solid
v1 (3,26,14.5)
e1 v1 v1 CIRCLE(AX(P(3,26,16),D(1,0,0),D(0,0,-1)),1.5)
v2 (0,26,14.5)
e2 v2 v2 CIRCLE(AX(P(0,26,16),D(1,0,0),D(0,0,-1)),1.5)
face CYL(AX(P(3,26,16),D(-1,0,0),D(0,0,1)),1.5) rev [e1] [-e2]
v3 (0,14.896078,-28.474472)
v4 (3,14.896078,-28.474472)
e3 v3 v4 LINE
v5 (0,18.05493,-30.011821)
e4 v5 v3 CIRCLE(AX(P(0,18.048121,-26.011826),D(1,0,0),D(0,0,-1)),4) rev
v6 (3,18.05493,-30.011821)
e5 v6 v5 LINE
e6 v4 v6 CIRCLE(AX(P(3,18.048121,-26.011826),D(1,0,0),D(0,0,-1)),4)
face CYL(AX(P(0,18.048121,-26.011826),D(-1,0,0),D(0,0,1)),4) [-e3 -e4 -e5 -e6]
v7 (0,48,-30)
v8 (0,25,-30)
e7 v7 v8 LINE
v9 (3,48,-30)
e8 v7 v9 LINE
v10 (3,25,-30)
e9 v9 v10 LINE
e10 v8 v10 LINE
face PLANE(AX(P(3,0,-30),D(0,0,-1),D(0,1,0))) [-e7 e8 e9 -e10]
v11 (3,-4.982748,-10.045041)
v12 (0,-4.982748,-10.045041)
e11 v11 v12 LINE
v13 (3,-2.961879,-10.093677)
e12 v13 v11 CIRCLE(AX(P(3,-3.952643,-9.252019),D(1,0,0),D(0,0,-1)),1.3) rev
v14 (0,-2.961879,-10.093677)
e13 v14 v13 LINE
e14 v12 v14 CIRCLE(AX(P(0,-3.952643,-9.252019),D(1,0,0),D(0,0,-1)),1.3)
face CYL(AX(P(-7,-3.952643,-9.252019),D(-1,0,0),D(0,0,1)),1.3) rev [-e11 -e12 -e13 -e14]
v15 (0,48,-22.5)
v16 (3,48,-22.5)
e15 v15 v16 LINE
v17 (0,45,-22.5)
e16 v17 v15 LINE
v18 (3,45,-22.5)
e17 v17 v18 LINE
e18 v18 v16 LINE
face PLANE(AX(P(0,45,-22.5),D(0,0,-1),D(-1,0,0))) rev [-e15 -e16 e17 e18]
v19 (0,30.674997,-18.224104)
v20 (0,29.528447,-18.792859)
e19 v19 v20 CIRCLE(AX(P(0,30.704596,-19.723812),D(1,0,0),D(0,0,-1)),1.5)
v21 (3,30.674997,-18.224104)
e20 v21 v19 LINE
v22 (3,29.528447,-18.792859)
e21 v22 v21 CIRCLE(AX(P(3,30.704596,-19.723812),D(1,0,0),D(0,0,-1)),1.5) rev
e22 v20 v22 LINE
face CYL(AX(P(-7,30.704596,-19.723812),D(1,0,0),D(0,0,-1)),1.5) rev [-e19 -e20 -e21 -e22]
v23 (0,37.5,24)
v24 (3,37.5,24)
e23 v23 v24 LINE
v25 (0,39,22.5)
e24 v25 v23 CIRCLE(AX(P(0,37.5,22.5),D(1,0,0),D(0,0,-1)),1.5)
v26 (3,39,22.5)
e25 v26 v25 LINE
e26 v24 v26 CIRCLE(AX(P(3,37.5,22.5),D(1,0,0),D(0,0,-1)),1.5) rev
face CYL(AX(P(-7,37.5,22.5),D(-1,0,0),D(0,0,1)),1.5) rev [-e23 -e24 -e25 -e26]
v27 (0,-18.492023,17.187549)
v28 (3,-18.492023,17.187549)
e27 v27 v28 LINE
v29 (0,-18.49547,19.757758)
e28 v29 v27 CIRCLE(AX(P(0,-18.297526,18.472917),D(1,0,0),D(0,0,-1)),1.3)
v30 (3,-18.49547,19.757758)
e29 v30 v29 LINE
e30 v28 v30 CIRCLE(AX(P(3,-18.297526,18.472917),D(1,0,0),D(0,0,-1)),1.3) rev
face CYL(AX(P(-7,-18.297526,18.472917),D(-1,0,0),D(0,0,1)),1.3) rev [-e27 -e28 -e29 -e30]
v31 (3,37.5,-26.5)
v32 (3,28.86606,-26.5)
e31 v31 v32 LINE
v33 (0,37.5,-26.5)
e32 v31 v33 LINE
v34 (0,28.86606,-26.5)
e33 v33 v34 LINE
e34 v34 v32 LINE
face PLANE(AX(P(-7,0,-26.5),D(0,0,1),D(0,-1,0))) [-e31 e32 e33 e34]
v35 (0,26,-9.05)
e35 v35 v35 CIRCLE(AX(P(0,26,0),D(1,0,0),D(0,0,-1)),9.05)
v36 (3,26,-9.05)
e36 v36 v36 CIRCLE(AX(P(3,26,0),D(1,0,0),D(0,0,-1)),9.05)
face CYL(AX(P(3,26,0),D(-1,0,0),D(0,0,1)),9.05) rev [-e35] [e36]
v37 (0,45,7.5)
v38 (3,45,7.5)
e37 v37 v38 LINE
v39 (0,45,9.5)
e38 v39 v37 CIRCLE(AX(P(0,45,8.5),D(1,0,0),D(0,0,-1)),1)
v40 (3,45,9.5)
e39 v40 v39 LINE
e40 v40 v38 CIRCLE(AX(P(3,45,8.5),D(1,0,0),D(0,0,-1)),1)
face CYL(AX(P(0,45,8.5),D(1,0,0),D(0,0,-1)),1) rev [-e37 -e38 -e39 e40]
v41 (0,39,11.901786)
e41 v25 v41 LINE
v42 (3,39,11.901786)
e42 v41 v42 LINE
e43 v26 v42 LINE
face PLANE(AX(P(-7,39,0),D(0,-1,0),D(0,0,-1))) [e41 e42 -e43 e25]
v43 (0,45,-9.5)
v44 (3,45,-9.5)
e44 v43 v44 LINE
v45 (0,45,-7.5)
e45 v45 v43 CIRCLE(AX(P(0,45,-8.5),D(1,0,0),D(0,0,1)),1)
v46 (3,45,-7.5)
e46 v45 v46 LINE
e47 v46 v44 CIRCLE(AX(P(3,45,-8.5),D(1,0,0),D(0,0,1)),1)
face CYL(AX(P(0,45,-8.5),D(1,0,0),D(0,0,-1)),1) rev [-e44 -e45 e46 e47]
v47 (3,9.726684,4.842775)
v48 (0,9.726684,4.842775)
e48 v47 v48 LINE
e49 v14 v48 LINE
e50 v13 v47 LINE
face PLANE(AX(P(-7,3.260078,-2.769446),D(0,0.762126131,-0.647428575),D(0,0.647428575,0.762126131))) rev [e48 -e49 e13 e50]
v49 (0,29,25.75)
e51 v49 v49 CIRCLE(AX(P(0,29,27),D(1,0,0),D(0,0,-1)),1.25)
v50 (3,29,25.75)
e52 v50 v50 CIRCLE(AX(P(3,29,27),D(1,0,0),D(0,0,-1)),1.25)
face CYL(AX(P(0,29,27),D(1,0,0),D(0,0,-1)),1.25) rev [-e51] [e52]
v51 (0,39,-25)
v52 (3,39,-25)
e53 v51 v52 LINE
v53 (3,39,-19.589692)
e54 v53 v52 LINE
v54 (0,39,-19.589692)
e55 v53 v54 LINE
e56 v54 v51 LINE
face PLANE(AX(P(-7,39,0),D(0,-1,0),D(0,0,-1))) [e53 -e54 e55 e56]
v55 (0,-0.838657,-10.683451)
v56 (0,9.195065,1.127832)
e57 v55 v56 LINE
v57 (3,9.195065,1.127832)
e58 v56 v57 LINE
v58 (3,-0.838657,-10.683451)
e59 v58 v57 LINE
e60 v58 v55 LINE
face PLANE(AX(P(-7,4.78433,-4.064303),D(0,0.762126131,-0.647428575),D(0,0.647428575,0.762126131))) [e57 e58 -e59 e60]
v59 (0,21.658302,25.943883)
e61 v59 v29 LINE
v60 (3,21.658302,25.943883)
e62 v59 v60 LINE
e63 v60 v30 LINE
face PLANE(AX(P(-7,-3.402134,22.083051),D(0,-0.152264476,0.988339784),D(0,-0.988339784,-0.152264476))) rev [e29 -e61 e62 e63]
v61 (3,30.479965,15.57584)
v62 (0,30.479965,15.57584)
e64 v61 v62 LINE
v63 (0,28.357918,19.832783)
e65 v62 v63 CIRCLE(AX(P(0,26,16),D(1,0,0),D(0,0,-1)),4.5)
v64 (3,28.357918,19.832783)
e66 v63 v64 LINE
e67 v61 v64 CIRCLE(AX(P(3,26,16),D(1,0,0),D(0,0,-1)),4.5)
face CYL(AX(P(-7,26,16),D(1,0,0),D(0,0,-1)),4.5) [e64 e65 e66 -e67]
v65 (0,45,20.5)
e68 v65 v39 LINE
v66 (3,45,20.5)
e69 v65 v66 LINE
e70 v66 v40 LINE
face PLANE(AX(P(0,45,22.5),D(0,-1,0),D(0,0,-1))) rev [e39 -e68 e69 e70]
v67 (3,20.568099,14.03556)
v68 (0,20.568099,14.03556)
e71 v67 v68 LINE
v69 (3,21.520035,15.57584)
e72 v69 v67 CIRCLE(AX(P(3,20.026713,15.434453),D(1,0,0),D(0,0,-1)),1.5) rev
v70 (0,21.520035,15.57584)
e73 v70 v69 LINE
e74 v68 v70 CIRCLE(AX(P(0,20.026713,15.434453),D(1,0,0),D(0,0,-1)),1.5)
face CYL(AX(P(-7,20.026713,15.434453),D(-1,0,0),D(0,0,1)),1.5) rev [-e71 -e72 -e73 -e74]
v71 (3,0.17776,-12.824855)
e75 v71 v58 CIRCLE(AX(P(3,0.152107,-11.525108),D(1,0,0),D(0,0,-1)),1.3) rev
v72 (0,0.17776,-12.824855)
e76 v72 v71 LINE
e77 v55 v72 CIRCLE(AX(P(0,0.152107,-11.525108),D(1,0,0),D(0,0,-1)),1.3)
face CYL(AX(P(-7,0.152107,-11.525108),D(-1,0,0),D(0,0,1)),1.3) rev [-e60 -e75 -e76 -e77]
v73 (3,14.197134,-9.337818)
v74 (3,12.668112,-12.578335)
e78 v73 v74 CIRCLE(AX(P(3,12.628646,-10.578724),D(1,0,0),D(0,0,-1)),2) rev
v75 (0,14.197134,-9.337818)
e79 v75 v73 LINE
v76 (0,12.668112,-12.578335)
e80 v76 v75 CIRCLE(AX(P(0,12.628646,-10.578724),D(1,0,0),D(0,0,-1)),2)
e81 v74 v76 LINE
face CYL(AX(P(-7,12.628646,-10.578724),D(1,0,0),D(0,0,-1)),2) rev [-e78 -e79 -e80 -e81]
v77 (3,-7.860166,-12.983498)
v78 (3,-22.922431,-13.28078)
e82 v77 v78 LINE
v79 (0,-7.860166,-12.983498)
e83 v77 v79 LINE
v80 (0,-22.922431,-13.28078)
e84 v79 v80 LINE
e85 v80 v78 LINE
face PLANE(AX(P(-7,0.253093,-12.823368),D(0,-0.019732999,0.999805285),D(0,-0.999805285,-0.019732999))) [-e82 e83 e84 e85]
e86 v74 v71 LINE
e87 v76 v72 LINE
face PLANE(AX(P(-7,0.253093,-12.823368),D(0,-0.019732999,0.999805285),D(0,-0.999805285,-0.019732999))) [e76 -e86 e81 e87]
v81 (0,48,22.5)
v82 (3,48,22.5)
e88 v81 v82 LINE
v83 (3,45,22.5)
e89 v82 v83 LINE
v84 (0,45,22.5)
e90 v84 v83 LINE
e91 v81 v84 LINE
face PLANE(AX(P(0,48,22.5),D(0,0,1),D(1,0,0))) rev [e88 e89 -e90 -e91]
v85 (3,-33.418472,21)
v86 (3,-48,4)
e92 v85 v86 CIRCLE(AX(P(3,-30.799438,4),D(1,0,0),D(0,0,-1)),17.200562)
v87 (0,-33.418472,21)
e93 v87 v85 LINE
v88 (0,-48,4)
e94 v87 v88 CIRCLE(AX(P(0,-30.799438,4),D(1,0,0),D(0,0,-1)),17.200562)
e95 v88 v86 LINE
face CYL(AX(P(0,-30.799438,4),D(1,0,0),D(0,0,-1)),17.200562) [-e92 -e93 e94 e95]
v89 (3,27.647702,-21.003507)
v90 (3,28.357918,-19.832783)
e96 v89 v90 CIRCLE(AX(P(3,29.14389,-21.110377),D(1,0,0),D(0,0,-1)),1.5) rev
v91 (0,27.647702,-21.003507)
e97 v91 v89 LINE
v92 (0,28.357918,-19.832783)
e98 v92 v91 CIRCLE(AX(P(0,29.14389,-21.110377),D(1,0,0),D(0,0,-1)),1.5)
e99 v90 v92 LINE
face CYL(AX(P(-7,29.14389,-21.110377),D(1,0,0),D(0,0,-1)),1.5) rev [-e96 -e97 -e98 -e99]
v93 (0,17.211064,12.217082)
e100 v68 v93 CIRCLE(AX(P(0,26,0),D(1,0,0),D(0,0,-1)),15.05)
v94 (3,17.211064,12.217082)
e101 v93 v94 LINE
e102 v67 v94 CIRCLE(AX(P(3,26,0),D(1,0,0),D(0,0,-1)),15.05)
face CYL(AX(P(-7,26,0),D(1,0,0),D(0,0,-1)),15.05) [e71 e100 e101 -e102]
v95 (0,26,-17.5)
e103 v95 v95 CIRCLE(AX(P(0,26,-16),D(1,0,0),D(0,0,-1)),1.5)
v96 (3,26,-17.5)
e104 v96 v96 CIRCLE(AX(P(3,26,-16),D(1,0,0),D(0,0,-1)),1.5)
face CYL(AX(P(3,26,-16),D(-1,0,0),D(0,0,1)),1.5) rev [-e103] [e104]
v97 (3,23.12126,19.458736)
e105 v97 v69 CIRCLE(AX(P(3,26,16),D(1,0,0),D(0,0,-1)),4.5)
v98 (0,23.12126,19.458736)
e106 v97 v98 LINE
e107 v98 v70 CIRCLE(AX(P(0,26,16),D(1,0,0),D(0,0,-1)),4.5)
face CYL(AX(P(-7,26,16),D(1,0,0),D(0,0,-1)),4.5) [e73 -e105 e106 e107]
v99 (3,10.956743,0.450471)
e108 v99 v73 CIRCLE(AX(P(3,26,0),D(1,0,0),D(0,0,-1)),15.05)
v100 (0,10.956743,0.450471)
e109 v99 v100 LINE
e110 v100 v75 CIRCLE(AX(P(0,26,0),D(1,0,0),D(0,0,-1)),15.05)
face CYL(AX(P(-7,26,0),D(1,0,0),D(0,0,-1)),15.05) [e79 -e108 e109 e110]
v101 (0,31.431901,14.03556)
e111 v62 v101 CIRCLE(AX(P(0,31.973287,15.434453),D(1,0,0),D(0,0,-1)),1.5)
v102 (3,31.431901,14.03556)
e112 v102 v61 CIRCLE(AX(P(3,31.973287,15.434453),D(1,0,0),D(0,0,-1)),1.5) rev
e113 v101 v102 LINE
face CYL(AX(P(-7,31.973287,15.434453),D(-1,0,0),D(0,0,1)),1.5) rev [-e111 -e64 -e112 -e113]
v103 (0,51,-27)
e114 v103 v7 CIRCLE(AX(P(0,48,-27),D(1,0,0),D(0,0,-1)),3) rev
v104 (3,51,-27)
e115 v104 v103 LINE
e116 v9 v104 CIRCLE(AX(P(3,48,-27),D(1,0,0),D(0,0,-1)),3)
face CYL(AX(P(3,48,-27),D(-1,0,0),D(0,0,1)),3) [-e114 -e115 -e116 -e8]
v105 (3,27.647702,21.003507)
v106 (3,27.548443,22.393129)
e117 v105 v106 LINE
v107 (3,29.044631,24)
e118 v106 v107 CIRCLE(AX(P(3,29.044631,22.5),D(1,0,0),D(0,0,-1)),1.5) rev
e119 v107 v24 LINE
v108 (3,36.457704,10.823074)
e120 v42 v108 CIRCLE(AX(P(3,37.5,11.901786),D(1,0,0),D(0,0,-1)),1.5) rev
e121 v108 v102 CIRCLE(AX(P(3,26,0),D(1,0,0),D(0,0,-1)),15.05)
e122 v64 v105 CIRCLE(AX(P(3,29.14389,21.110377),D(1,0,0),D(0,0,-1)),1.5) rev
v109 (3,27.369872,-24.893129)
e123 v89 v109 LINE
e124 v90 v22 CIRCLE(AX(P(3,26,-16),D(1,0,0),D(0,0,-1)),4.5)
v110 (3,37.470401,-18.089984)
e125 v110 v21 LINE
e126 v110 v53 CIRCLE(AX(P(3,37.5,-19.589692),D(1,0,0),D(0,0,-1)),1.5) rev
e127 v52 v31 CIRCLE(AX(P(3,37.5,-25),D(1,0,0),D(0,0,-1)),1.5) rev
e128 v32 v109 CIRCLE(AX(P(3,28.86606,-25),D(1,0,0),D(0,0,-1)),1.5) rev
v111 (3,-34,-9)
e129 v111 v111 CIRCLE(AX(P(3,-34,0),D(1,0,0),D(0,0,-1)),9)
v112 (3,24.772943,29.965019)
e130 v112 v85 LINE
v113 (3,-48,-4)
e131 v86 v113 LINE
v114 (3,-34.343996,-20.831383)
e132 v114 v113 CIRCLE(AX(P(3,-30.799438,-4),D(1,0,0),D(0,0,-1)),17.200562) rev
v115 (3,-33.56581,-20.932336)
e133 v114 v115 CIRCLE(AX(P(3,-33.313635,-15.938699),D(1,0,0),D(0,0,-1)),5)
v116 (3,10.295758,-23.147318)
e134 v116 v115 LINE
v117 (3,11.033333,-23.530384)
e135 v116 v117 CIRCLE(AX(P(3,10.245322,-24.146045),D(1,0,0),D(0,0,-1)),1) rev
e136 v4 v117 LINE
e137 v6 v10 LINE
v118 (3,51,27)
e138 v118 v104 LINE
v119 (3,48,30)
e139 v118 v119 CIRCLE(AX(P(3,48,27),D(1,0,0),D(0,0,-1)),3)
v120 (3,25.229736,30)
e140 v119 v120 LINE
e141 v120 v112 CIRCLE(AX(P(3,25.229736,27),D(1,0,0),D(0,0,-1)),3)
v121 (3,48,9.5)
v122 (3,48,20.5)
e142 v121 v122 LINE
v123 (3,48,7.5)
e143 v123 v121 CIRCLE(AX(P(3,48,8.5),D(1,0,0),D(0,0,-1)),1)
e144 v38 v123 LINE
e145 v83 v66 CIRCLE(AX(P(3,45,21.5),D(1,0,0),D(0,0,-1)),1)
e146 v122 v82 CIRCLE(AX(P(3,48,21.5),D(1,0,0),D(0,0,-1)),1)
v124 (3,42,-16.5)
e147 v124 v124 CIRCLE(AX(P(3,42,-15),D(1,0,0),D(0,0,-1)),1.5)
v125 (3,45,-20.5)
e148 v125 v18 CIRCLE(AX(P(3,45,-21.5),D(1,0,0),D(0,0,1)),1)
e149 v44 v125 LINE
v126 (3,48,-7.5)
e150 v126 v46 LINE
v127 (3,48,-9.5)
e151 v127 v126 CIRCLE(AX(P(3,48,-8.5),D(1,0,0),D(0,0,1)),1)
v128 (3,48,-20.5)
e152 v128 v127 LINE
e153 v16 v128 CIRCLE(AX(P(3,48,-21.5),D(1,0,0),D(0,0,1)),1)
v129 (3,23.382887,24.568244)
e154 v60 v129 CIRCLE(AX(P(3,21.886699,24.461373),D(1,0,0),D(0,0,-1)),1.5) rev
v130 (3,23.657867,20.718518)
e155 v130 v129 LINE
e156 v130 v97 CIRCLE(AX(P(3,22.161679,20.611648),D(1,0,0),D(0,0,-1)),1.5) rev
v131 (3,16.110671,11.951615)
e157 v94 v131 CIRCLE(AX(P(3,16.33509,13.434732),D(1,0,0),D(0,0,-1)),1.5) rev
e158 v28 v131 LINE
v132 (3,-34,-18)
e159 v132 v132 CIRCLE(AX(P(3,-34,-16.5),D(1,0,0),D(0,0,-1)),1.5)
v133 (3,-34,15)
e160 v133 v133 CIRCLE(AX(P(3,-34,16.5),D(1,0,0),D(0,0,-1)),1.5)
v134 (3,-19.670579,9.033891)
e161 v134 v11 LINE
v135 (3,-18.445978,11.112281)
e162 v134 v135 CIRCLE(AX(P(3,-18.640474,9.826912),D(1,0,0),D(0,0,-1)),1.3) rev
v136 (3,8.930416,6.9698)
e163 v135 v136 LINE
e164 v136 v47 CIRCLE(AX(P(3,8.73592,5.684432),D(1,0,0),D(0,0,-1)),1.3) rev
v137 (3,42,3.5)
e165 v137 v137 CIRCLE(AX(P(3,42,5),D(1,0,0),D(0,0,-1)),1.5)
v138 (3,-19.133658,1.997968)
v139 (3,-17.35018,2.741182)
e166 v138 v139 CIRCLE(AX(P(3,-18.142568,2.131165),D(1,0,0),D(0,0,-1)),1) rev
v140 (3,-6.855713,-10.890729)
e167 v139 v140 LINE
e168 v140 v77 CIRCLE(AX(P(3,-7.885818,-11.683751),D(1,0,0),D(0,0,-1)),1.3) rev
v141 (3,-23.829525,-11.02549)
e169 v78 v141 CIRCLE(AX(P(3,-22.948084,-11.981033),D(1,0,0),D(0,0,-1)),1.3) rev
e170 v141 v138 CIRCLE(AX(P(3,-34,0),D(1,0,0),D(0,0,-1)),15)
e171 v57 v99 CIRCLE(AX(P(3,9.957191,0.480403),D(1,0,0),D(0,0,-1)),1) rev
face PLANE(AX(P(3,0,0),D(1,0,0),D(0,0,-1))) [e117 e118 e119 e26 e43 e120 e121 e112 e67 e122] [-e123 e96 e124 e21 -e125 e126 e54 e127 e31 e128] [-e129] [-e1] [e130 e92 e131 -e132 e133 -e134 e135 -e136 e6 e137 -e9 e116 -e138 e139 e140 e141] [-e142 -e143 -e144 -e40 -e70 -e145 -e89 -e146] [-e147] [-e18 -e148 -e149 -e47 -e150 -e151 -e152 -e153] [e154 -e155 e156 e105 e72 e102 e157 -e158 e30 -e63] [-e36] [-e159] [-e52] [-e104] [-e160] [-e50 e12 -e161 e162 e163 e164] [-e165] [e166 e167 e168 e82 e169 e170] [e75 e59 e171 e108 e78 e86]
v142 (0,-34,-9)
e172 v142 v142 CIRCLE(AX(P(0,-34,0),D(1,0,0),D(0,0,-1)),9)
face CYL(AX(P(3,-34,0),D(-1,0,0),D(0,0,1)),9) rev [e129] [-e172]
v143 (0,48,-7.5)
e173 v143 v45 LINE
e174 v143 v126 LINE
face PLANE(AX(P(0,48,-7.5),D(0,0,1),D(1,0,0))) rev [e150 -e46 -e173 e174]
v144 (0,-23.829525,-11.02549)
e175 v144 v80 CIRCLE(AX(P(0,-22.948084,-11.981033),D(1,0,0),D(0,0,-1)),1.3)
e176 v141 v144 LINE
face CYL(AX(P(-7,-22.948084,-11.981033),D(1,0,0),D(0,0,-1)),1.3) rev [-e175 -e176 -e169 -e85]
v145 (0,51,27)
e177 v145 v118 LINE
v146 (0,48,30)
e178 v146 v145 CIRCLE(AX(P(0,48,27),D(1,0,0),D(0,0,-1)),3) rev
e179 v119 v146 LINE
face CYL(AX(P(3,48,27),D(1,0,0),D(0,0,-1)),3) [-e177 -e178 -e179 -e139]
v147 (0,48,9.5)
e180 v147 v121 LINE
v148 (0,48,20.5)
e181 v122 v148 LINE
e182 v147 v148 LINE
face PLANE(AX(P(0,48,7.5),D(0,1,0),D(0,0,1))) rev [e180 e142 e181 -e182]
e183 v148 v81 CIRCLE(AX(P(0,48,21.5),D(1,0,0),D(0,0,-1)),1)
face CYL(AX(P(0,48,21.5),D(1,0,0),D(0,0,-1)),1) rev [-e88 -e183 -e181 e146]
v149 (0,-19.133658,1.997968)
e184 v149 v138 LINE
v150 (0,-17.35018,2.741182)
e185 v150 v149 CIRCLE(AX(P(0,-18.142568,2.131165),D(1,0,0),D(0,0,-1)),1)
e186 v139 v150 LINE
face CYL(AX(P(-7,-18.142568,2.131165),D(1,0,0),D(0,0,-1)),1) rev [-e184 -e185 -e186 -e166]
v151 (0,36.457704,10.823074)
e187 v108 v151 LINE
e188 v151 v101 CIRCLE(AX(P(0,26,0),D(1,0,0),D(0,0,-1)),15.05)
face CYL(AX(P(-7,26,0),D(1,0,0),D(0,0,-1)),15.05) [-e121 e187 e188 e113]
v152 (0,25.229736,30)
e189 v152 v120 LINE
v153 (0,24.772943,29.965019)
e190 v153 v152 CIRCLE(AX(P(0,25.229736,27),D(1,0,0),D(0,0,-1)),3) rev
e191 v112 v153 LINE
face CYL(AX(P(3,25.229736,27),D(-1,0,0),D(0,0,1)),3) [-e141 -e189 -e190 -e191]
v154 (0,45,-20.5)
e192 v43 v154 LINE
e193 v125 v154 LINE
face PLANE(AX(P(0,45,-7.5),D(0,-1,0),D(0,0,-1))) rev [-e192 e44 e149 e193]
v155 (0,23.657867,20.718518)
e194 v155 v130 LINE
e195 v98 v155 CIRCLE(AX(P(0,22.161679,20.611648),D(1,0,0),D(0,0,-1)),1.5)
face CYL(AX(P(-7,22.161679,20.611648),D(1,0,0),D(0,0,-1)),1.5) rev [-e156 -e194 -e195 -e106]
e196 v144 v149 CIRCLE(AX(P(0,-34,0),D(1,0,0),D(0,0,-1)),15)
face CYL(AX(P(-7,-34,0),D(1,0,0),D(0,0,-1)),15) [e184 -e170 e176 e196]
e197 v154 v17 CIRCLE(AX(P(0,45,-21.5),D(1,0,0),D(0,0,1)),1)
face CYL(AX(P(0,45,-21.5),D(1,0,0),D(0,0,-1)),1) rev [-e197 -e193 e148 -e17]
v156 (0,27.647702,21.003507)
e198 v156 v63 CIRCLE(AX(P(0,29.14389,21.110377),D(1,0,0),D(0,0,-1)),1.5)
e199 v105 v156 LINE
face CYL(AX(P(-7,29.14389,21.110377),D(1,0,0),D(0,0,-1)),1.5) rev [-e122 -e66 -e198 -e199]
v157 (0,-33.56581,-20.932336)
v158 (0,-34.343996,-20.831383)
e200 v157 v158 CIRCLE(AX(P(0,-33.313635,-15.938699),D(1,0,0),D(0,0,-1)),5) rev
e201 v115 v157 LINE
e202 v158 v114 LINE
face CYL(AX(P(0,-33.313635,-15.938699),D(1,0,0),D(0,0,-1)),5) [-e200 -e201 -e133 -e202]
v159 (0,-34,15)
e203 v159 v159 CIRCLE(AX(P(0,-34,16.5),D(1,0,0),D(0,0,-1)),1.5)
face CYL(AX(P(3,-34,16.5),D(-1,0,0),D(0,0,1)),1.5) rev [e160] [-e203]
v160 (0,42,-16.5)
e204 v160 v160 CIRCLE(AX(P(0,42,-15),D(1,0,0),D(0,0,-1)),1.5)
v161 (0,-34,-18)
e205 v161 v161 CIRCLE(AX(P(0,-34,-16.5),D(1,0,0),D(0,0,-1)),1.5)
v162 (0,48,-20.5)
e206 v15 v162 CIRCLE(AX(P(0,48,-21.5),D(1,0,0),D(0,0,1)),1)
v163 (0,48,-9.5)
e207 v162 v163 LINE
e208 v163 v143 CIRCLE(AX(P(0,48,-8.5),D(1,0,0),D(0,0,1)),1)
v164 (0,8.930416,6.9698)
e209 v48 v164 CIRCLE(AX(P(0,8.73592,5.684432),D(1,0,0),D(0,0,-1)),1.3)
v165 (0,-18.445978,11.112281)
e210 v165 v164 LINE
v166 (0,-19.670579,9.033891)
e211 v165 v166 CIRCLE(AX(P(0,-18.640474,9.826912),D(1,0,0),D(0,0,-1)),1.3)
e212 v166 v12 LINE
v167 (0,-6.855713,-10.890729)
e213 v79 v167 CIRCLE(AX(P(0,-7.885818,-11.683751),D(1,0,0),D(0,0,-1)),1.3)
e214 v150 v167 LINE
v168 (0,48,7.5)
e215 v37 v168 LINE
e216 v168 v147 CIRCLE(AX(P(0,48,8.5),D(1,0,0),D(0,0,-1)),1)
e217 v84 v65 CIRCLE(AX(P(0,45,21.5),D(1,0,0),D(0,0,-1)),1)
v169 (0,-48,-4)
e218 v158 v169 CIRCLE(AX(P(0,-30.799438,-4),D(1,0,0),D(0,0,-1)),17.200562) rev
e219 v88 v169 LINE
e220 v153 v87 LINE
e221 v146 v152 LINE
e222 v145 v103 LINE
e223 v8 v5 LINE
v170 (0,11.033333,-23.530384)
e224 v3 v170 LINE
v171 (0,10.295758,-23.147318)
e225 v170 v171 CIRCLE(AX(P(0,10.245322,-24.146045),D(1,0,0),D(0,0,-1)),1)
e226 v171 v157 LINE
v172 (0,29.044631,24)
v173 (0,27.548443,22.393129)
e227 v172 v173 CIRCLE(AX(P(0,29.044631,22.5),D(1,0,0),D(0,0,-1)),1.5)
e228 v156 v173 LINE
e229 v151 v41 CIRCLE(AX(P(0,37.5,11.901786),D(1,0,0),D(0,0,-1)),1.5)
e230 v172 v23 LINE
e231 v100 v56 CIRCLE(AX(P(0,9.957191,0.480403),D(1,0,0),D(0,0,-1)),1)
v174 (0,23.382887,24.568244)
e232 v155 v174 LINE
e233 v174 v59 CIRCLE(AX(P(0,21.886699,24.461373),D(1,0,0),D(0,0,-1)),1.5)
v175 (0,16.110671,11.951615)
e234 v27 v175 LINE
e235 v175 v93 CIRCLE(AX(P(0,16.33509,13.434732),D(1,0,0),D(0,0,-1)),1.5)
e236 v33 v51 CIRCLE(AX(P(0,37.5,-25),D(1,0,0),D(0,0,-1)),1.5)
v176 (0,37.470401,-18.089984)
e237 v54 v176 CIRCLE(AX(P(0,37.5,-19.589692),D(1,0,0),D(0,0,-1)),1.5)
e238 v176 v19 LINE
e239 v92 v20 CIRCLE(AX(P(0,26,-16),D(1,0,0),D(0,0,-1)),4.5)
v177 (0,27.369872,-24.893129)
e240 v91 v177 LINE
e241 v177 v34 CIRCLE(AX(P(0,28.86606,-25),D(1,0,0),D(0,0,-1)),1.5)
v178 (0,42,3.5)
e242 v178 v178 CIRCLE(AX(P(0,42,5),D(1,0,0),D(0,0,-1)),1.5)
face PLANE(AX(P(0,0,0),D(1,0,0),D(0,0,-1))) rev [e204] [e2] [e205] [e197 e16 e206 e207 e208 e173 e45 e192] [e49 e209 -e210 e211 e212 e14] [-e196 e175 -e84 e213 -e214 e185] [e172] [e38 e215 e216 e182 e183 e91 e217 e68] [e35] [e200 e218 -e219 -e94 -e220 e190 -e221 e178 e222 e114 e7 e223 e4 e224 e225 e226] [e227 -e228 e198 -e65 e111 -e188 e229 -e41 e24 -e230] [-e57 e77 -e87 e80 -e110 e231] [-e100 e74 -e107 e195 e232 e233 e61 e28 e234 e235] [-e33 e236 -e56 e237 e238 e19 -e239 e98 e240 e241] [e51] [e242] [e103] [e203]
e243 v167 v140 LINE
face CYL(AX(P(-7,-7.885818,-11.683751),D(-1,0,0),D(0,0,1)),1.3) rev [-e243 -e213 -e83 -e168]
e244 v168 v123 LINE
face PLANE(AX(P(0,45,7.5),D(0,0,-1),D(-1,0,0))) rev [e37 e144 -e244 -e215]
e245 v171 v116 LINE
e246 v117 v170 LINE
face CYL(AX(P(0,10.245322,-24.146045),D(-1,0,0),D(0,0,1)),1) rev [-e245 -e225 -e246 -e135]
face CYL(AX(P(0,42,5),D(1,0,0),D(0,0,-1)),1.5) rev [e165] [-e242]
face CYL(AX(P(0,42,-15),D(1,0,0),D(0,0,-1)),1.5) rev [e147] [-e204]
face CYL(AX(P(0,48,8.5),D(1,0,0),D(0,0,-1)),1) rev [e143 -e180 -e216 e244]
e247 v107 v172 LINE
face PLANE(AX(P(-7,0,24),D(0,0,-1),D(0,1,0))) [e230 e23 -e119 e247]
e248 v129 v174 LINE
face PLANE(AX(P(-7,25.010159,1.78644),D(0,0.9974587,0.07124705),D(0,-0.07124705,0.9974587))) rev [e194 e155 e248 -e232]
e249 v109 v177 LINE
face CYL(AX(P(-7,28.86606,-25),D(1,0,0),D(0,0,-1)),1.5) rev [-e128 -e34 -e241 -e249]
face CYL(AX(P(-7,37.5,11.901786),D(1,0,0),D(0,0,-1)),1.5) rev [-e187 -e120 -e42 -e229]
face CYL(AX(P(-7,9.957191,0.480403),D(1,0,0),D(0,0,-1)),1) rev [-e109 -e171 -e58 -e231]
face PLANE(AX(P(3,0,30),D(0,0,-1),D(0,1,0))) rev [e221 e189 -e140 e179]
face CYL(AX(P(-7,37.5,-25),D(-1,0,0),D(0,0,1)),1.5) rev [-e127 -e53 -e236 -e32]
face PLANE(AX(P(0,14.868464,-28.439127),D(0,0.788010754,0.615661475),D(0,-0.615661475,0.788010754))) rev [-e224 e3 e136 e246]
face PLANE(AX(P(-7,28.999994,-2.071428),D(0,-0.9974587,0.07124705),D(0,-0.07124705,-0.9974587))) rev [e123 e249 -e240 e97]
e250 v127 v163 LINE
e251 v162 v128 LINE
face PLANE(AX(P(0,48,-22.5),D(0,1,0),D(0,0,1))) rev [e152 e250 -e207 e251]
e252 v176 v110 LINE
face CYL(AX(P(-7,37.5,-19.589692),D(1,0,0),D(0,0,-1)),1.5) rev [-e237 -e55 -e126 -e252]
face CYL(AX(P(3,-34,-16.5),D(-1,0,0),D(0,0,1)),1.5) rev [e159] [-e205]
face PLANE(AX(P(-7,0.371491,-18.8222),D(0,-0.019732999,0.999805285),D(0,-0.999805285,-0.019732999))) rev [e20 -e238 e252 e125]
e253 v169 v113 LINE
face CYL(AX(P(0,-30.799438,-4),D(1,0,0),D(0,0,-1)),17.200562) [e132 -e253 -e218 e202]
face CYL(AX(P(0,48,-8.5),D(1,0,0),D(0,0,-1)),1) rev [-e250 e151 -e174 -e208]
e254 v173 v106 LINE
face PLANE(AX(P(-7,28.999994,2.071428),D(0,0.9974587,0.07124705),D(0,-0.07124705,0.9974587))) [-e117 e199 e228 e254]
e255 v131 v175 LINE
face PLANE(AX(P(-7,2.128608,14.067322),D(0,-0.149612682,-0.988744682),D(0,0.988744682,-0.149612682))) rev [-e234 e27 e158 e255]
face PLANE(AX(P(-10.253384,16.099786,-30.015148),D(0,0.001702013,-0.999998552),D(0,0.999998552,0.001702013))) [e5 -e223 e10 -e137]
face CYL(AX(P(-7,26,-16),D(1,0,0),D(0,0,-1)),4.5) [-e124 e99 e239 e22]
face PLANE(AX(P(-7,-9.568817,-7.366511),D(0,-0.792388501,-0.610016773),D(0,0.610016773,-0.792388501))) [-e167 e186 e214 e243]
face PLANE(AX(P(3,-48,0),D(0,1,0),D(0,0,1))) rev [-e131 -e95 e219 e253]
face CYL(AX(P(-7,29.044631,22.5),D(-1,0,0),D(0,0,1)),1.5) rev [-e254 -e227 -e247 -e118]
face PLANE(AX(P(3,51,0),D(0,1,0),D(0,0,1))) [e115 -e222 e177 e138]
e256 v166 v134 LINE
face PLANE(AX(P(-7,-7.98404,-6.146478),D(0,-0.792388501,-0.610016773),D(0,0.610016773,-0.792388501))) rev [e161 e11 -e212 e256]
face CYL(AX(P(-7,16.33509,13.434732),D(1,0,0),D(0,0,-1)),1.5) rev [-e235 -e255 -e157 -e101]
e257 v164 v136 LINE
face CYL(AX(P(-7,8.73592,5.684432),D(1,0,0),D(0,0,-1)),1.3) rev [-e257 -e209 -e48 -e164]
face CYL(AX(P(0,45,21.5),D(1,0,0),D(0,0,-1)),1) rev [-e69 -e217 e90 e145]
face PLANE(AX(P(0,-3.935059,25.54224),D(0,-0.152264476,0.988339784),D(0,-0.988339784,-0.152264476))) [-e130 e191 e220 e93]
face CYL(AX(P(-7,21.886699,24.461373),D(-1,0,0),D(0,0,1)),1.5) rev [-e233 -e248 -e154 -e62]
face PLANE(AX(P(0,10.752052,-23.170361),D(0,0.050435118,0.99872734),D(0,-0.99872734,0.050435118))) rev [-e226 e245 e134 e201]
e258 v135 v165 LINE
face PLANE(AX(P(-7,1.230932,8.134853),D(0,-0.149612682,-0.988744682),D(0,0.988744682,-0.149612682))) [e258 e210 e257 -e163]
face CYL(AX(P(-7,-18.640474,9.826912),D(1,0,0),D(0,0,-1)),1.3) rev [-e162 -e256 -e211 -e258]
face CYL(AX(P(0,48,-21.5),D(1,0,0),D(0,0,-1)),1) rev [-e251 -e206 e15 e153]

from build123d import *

# Parameters (mm, degrees)
SKETCH_1_W          = 60
SKETCH_1_H          = 96
SKETCH_1_R          = 1.5
SKETCH_1_R_2        = 9
SKETCH_1_R_3        = 9.05
SKETCH_1_H_2        = 3
EXTRUDE_1_DEPTH     = 3
CUT_EXTRUDE_START   = -3
CUT_EXTRUDE_1_DEPTH = 3
SKETCH_3_R          = 1.25
SKETCH_3_R_2        = 1.5
SKETCH_3_W          = 15
SKETCH_3_H          = 3
CUT_EXTRUDE_2_DEPTH = 60.245252974
SKETCH_4_R          = 1
CUT_EXTRUDE_3_DEPTH = 60.245252974
CUT_EXTRUDE_4_DEPTH = 10
CUT_EXTRUDE_5_DEPTH = 60.245252974
EXTRUDE_2_DEPTH     = 3
FILLET_1_R          = 1.3
FILLET_9_R          = 2
FILLET_3_R          = 3
FILLET_4_R          = 1.5
FILLET_5_R          = 4
CUT_EXTRUDE_6_DEPTH = 60.251242528
FILLET_6_R          = 1
FILLET_10_R         = 5


# Read off the part's stored shape, not the designer's step: 切除-拉伸1
with BuildPart() as part:
    # 草图1 → 凸台-拉伸1 (new body)
    # profile 1 of 2: a face of its own
    with BuildSketch(Plane(origin=(0, 0, 0), x_dir=(0, 0, -1), z_dir=(1, 0, 0))):
        Rectangle(SKETCH_1_W, SKETCH_1_H)
        with Locations((16.5, -34)):
            Circle(SKETCH_1_R, mode=Mode.SUBTRACT)
        with Locations((-16.5, -34)):
            Circle(SKETCH_1_R, mode=Mode.SUBTRACT)
        with Locations((16, 26)):
            Circle(SKETCH_1_R, mode=Mode.SUBTRACT)
        with Locations((-16, 26)):
            Circle(SKETCH_1_R, mode=Mode.SUBTRACT)
        with Locations((0, -34)):
            Circle(SKETCH_1_R_2, mode=Mode.SUBTRACT)
        with Locations((0, 26)):
            Circle(SKETCH_1_R_3, mode=Mode.SUBTRACT)
    # profile 2 of 2: a face of its own
    with BuildSketch(Plane(origin=(0, 0, 0), x_dir=(0, 0, -1), z_dir=(1, 0, 0))):
        with Locations((0, 49.5)):
            Rectangle(SKETCH_1_W, SKETCH_1_H_2)
    extrude(amount=EXTRUDE_1_DEPTH)

    # 切除-拉伸1 outline → 切除-拉伸1 (cut)
    with BuildSketch(Plane(origin=(3, 0, 0), x_dir=(0, 0, -1), z_dir=(1, 0, 0)).offset(CUT_EXTRUDE_START)):
        with BuildLine():
            Line((30, -48), (30, 25))
            Line((30, 25), (21, -33.41847233))
            ThreePointArc((21, -33.41847233), (15.198447986, -43.855245061), (4, -48))
            Line((4, -48), (30, -48))
        make_face()
        with BuildLine():
            Line((-30, -48), (-4, -48))
            ThreePointArc((-4, -48), (-15.198447986, -43.855245061), (-21, -33.41847233))
            Line((-21, -33.41847233), (-30, 25))
            Line((-30, 25), (-30, -48))
        make_face()
    extrude(amount=CUT_EXTRUDE_1_DEPTH, mode=Mode.SUBTRACT)

    # 草图3 → 切除-拉伸2 (cut, through all)
    with BuildSketch(Plane(origin=(3, 0, 0), x_dir=(0, 0, -1), z_dir=(1, 0, 0))):
        with Locations((-27, 29)):
            Circle(SKETCH_3_R)
        with Locations((15, 42)):
            Circle(SKETCH_3_R_2)
        with Locations((-5, 42)):
            Circle(SKETCH_3_R_2)
        with Locations((-15, 46.5)):
            Rectangle(SKETCH_3_W, SKETCH_3_H)
        with Locations((15, 46.5)):
            Rectangle(SKETCH_3_W, SKETCH_3_H)
    extrude(amount=-CUT_EXTRUDE_2_DEPTH, mode=Mode.SUBTRACT)

    # 草图4 → 切除-拉伸3 (cut, through all)
    with BuildSketch(Plane(origin=(3, 0, 0), x_dir=(0, 0, -1), z_dir=(1, 0, 0))):
        with Locations((-21.5, 48)):
            Circle(SKETCH_4_R)
        with Locations((-21.5, 45)):
            Circle(SKETCH_4_R)
        with Locations((-8.5, 48)):
            Circle(SKETCH_4_R)
        with Locations((-8.5, 45)):
            Circle(SKETCH_4_R)
        with Locations((8.5, 45)):
            Circle(SKETCH_4_R)
        with Locations((8.5, 48)):
            Circle(SKETCH_4_R)
        with Locations((21.5, 45)):
            Circle(SKETCH_4_R)
        with Locations((21.5, 48)):
            Circle(SKETCH_4_R)
    extrude(amount=-CUT_EXTRUDE_3_DEPTH, mode=Mode.SUBTRACT)

    # 草图6 → 切除-拉伸4 (cut)
    with BuildSketch(Plane(origin=(3, 0, 0), x_dir=(0, 0, -1), z_dir=(1, 0, 0))):
        with BuildLine():
            Line((-18.4613646, -26.910285625), (-11.857625415, 16.731816817))
            ThreePointArc((-11.857625415, 16.731816817), (-13.391258067, 19.13146978), (-14.445390625, 21.777063854))
            ThreePointArc((-14.445390625, 21.777063854), (-17.513828963, 21.762273974), (-19.878390466, 23.71787656))
            Line((-19.878390466, 23.71787656), (-26.191708785, 23.266925251))
            Line((-26.191708785, 23.266925251), (-18.4613646, -26.910285625))
        make_face()
        Polygon((11.318506757, -4.002376427), (-6.62076356, 11.237090825), (-11.596047133, -21.643044091), align=None)
        with BuildLine():
            Line((13.365007146, -27.189964466), (12.932647682, -5.283751611))
            Line((12.932647682, -5.283751611), (-7.478738852, -20.99736699))
            ThreePointArc((-7.478738852, -20.99736699), (4.271897059, -19.621165015), (13.365007146, -27.189964466))
        make_face()
        with BuildLine():
            Line((12.881773753, -2.706139182), (12.481185497, 17.590332433))
            ThreePointArc((12.481185497, 17.590332433), (5.342673899, 11.930233278), (-3.753500841, 11.425579551))
            Line((-3.753500841, 11.425579551), (12.881773753, -2.706139182))
        make_face()
        with BuildLine():
            Line((26.5, 39), (18.059794784, 39))
            Line((18.059794784, 39), (18.239335866, 29.903251834))
            ThreePointArc((18.239335866, 29.903251834), (19.384344521, 28.965840886), (20.163378666, 27.707711359))
            Line((20.163378666, 27.707711359), (26.5, 27.25509555))
            Line((26.5, 27.25509555), (26.5, 39))
        make_face()
        with BuildLine():
            Line((-8.584722927, 38.361433261), (-8.488097697, 39))
            Line((-8.488097697, 39), (-24, 39))
            Line((-24, 39), (-24, 27.433666978))
            Line((-24, 27.433666978), (-20.163378666, 27.707711359))
            ThreePointArc((-20.163378666, 27.707711359), (-17.811907347, 30.119100844), (-14.445390625, 30.222936146))
            ThreePointArc((-14.445390625, 30.222936146), (-12.212915965, 34.794724761), (-8.584722927, 38.361433261))
        make_face()
        with BuildLine():
            ThreePointArc((-8.584722927, 38.361433261), (-8.090184405, 38.690603464), (-7.583040287, 39))
            Line((-7.583040287, 39), (-8.488097697, 39))
            Line((-8.488097697, 39), (-8.584722927, 38.361433261))
        make_face()
    extrude(amount=-CUT_EXTRUDE_4_DEPTH, mode=Mode.SUBTRACT)

    # 草图7 → 切除-拉伸5 (cut, through all)
    with BuildSketch(Plane(origin=(3, 0, 0), x_dir=(0, 0, -1), z_dir=(1, 0, 0))):
        Polygon((28.43912679, 14.868463508), (23.170360519, 10.752052151), (24.727709786, -9.222126667), align=None)
    extrude(amount=-CUT_EXTRUDE_5_DEPTH, mode=Mode.SUBTRACT)

    # 草图8 → 凸台-拉伸2 (add)
    with BuildSketch(Plane(origin=(3, 0, 0), x_dir=(0, 0, -1), z_dir=(1, 0, 0))):
        Polygon((28.43912679, 14.868463508), (30.015148297, 16.099786459), (30, 25), align=None)
    extrude(amount=-EXTRUDE_2_DEPTH)

    # 圆角1
    fillet_1_edges = [part.edges().sort_by_distance(p)[0] for p in [
        (1.5, -2.706139182, -12.881773753),
        (1.5, -4.002376427, -11.318506757),
        (1.5, -21.643044091, 11.596047133),
        (1.5, 11.237090825, 6.62076356),
        (1.5, -27.189964466, -13.365007146),
        (1.5, -5.283751611, -12.932647682),
        (1.5, -26.910285625, 18.4613646),
    ]]
    fillet(fillet_1_edges, radius=FILLET_1_R)

    # 圆角9
    fillet_9_edges = [part.edges().sort_by_distance(p)[0] for p in [
        (1.5, 17.590332433, -12.481185497),
    ]]
    fillet(fillet_9_edges, radius=FILLET_9_R)

    # 圆角3
    fillet_3_edges = [part.edges().sort_by_distance(p)[0] for p in [
        (1.5, 51, 30),
        (1.5, 51, -30),
        (1.5, 25, 30),
    ]]
    fillet(fillet_3_edges, radius=FILLET_3_R)

    # 圆角4
    fillet_4_edges = [part.edges().sort_by_distance(p)[0] for p in [
        (1.5, 27.707711359, -20.163378666),
        (1.5, 29.903251834, -18.239335866),
        (1.5, 39, -18.059794784),
        (1.5, 39, -26.5),
        (1.5, 27.25509555, -26.5),
        (1.5, 30.222936146, 14.445390625),
        (1.5, 27.707711359, 20.163378666),
        (1.5, 27.433666978, 24),
        (1.5, 39, 24),
        (1.5, 39, 7.583040287),
        (1.5, 23.71787656, 19.878390466),
        (1.5, 21.777063854, 14.445390625),
        (1.5, 16.731816817, 11.857625415),
        (1.5, 23.266925251, 26.191708785),
    ]]
    fillet(fillet_4_edges, radius=FILLET_4_R)

    # 圆角5
    fillet_5_edges = [part.edges().sort_by_distance(p)[0] for p in [
        (1.5, 16.099786459, -30.015148297),
    ]]
    fillet(fillet_5_edges, radius=FILLET_5_R)

    # 草图9 → 切除-拉伸6 (cut, through all)
    with BuildSketch(Plane(origin=(3, 0, 0), x_dir=(0, 0, -1), z_dir=(1, 0, 0))):
        Polygon((23.170360519, 10.752052151), (20.910409348, -34), (24.727709786, -9.222126667), align=None)
    extrude(amount=-CUT_EXTRUDE_6_DEPTH, mode=Mode.SUBTRACT)

    # 圆角6
    fillet_6_edges = [part.edges().sort_by_distance(p)[0] for p in [
        (1.5, 11.425579551, 3.753500841),
        (1.5, -20.99736699, 7.478738852),
        (1.5, 10.752052151, -23.170360519),
    ]]
    fillet(fillet_6_edges, radius=FILLET_6_R)

    # 圆角10
    fillet_10_edges = [part.edges().sort_by_distance(p)[0] for p in [
        (1.5, -33.925032861, -20.914195142),
    ]]
    fillet(fillet_10_edges, radius=FILLET_10_R)


solid = part.part
